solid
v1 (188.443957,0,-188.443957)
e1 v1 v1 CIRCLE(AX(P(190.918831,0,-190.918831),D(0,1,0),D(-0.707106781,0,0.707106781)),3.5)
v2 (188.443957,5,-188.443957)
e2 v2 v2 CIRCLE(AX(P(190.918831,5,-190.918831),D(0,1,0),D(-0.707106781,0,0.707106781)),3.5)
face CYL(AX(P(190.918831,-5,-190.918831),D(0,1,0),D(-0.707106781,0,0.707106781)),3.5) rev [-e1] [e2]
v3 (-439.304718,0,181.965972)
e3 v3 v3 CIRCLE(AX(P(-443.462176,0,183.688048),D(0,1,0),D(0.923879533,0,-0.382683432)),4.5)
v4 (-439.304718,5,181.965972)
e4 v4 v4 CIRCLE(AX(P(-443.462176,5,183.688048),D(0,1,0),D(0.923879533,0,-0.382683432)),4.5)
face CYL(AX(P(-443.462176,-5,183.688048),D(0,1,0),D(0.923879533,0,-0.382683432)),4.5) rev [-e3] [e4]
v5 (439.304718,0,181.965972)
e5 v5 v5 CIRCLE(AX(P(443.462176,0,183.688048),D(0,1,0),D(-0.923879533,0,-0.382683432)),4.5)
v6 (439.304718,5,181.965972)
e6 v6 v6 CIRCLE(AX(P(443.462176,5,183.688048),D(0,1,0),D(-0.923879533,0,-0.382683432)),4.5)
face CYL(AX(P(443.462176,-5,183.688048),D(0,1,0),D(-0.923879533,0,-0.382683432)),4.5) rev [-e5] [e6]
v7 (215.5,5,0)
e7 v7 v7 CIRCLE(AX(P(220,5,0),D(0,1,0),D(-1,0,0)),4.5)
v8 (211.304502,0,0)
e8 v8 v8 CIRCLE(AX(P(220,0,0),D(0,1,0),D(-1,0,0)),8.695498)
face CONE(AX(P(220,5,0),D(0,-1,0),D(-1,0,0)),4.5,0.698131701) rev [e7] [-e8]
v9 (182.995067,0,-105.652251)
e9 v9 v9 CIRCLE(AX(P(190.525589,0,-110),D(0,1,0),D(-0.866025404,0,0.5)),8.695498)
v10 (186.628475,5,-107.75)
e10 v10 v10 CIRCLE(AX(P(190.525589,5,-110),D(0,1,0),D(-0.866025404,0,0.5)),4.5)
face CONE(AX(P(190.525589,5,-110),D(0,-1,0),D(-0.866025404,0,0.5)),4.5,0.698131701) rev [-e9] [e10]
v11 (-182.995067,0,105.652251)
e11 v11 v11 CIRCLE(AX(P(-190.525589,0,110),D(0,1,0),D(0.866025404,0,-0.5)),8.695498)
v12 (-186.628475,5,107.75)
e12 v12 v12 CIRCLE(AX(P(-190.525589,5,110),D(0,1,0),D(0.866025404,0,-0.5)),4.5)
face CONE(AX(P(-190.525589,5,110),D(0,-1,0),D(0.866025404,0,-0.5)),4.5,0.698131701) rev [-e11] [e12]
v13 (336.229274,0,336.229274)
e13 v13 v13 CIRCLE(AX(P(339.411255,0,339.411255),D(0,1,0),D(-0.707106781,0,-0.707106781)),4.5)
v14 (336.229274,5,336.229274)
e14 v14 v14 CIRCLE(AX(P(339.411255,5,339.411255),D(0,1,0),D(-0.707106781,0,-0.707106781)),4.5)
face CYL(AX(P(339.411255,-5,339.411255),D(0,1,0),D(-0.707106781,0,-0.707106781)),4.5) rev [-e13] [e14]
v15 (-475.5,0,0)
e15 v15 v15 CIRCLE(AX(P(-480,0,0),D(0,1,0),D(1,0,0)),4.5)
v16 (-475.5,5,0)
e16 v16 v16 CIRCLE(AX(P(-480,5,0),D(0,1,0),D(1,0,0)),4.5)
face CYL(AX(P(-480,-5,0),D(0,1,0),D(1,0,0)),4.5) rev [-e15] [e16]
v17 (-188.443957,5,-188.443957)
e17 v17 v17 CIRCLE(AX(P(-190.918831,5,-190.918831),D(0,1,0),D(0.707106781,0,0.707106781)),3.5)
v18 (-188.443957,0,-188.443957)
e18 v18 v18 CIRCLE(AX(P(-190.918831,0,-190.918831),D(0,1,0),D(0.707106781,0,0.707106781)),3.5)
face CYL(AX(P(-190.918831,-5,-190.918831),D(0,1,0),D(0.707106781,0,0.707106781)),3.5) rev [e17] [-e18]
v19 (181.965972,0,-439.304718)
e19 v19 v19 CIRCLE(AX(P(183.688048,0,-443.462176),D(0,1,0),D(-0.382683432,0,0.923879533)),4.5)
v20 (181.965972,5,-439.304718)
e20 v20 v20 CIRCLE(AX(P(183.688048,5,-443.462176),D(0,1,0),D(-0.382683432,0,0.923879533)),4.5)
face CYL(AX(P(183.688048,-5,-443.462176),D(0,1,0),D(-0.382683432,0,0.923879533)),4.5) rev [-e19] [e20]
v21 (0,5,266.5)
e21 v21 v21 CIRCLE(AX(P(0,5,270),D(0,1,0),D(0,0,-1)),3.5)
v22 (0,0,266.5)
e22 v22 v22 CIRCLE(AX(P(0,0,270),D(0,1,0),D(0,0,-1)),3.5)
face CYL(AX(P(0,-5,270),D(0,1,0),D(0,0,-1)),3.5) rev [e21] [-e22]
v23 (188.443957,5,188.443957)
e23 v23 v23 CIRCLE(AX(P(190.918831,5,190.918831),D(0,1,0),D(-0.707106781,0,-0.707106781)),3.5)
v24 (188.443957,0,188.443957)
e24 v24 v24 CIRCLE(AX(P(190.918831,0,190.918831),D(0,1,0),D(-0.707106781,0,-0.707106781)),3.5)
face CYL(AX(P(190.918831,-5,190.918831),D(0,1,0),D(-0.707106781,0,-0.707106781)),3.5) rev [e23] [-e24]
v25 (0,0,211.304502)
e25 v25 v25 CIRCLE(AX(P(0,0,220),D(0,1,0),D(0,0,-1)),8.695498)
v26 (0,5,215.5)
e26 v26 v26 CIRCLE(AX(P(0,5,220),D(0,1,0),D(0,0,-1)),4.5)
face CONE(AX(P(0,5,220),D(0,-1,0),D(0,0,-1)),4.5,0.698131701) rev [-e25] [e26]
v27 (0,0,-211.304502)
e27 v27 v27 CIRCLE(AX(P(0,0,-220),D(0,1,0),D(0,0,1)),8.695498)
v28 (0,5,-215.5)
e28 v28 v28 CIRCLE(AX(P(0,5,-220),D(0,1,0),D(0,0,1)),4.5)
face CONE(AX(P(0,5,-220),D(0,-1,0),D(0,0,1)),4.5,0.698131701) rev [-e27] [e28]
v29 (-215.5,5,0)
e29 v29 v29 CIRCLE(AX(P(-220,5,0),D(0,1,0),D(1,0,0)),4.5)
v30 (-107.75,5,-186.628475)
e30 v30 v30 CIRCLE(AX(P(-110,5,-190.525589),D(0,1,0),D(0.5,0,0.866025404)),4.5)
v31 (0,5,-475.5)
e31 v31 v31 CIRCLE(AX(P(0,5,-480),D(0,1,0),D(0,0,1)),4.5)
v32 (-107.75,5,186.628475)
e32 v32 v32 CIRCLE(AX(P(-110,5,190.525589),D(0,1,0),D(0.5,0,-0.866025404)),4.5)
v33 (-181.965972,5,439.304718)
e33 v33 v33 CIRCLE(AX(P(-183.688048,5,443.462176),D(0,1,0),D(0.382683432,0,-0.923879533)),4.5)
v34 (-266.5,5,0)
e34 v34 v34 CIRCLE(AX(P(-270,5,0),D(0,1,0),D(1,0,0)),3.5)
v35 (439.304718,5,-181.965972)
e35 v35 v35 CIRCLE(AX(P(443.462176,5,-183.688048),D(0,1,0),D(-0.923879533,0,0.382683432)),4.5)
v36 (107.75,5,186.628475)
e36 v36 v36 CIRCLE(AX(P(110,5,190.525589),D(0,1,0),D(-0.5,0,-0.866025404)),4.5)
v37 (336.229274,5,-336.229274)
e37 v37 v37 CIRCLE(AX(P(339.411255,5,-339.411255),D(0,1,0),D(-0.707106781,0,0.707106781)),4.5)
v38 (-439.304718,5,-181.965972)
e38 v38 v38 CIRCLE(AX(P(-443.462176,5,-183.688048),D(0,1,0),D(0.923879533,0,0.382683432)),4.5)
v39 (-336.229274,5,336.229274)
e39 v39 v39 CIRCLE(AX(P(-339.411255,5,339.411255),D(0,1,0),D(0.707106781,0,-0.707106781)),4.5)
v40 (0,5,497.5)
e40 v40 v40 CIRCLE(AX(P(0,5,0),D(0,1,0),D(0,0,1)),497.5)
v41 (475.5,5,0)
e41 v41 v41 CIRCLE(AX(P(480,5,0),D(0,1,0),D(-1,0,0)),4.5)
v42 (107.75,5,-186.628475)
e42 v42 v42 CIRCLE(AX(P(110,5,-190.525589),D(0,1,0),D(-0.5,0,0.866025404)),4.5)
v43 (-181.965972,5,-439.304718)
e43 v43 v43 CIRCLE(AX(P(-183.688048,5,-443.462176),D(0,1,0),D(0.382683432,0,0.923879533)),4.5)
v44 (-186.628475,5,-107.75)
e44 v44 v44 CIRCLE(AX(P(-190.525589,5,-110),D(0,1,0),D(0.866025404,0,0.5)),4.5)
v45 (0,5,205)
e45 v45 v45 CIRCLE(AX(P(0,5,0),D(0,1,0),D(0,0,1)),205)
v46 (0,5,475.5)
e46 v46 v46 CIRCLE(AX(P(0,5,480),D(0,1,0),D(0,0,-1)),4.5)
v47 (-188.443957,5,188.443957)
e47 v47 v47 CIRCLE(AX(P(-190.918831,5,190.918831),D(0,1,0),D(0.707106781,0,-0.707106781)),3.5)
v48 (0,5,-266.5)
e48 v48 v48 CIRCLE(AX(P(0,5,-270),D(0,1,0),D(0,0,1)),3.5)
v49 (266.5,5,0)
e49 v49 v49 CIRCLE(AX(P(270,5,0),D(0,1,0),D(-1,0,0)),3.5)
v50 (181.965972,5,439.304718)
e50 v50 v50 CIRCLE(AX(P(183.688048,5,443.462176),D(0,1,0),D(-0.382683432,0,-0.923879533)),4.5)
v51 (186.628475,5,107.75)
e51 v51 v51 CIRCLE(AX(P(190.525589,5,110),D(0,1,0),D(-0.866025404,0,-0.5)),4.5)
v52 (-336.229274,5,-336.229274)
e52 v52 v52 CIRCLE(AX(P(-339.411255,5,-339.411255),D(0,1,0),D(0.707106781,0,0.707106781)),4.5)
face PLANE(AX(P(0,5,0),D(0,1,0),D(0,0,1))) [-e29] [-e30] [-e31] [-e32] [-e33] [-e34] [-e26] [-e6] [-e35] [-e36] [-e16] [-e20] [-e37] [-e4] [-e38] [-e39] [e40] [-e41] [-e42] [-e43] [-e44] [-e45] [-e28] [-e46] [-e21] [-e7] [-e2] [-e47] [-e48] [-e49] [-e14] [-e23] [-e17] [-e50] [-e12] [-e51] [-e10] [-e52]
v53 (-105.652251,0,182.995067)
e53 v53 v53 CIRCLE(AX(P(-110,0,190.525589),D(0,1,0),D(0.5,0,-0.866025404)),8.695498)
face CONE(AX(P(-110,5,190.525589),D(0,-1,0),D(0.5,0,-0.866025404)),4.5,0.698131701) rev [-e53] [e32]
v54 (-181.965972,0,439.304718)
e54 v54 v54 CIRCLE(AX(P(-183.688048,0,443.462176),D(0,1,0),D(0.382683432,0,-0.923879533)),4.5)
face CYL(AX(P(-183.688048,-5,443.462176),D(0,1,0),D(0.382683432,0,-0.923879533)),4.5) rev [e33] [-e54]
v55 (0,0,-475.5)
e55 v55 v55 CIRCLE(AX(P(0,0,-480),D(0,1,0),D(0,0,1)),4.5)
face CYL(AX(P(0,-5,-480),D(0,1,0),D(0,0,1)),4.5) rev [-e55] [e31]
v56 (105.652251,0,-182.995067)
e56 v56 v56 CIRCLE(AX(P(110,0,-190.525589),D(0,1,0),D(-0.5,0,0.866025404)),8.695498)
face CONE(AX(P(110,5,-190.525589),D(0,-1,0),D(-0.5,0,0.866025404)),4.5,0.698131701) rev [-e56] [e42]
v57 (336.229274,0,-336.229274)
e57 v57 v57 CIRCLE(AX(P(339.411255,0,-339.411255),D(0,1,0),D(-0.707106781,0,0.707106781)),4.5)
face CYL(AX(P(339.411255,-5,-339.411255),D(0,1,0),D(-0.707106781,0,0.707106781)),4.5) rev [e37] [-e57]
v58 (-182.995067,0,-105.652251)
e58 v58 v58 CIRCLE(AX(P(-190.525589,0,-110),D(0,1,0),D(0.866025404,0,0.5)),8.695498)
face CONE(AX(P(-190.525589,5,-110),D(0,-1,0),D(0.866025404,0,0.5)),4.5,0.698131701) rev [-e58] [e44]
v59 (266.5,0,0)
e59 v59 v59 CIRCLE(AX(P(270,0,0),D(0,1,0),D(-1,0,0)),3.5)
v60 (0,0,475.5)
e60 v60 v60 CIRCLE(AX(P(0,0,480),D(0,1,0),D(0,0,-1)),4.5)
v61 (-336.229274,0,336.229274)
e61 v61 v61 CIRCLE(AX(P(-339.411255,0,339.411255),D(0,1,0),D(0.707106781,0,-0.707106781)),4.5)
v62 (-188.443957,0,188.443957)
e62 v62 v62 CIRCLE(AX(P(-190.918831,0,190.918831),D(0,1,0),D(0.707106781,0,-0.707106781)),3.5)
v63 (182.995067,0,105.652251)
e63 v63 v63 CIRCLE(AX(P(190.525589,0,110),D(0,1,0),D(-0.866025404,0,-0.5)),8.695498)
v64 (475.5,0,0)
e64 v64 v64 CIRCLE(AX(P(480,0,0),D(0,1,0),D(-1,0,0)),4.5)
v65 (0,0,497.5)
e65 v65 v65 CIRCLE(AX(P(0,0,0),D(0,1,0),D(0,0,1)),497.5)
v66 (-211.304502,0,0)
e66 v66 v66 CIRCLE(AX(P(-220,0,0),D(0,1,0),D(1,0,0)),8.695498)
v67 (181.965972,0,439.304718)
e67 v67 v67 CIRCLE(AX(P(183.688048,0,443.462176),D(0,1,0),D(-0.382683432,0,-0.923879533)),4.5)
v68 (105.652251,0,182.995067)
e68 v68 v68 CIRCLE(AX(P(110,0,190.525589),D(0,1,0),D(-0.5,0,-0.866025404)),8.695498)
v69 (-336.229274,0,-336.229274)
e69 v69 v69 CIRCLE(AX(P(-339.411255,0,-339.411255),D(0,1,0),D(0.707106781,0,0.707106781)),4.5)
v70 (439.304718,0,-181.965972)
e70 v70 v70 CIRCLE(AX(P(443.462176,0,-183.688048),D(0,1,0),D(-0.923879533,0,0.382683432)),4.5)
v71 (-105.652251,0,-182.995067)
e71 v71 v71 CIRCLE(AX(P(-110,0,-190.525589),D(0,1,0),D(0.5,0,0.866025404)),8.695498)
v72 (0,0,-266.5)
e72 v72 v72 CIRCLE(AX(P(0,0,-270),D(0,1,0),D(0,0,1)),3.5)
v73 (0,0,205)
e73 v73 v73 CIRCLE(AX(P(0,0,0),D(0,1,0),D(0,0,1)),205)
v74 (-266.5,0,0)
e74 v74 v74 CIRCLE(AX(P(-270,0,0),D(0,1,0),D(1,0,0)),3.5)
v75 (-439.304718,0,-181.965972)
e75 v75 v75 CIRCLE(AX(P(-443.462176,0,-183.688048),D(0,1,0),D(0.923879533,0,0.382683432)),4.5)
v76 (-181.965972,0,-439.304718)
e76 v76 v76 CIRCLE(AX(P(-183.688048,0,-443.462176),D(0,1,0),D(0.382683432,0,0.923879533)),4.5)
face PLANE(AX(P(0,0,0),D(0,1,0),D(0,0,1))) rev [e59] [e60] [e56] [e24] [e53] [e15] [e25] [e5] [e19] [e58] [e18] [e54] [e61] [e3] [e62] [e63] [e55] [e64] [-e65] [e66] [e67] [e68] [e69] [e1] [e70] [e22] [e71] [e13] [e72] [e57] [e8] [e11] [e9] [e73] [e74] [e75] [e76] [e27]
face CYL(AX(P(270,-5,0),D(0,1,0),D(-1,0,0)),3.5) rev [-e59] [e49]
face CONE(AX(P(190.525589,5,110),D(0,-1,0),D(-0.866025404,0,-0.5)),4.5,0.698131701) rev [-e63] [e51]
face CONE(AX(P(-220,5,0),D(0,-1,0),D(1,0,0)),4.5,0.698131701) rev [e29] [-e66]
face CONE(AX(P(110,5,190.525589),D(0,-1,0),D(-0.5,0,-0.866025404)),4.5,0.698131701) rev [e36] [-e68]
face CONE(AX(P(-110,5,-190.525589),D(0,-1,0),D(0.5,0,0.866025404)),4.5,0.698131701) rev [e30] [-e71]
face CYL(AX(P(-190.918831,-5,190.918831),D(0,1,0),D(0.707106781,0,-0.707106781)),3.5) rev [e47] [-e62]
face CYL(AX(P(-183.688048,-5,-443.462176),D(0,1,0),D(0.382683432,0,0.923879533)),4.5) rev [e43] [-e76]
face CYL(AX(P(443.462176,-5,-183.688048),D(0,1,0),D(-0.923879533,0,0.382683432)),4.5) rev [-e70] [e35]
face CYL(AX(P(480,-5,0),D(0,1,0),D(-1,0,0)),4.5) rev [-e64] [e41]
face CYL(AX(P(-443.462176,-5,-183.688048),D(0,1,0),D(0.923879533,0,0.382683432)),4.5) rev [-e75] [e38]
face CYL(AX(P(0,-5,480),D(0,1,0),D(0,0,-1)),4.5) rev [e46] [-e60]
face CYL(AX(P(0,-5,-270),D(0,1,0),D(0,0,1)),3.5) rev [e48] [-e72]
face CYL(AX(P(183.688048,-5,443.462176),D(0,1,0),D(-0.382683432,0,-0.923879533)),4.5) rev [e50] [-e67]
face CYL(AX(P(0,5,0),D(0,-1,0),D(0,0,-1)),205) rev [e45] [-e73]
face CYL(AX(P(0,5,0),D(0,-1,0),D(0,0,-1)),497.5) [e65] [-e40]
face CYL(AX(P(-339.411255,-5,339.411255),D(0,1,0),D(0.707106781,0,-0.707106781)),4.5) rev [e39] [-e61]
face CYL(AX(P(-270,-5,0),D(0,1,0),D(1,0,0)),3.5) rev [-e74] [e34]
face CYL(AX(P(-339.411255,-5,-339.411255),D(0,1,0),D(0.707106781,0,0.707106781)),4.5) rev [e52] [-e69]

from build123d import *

# Parameters (mm, degrees)
SKETCH1_R                    = 497.5
SKETCH1_R_2                  = 205
BOSS_EXTRUDE1_DEPTH          = 5
SKETCH2_R                    = 4.5
SKETCH2_R_2                  = 3.5
CUT_EXTRUDE1_DEPTH           = 10
CIRPATTERN1_OUTLINE_R        = 4.5
CIRPATTERN1_DEPTH            = 5
CIRPATTERN2_COUNT            = 8
SKETCH3_R                    = 4.5
CUT_EXTRUDE3_DEPTH           = 10
CUT_EXTRUDE3_DRAFT           = 40
CIRPATTERN3_COPY_1_SKETCH_R  = 4.5
CIRPATTERN3_COPY_1_DEPTH     = 10
CIRPATTERN3_COPY_1_DRAFT     = 40
CIRPATTERN3_COPY_2_SKETCH_R  = 4.5
CIRPATTERN3_COPY_2_DEPTH     = 10
CIRPATTERN3_COPY_2_DRAFT     = 40
CIRPATTERN3_COPY_3_SKETCH_R  = 4.5
CIRPATTERN3_COPY_3_DEPTH     = 10
CIRPATTERN3_COPY_3_DRAFT     = 40
CIRPATTERN3_COPY_4_SKETCH_R  = 4.5
CIRPATTERN3_COPY_4_DEPTH     = 10
CIRPATTERN3_COPY_4_DRAFT     = 40
CIRPATTERN3_COPY_5_SKETCH_R  = 4.5
CIRPATTERN3_COPY_5_DEPTH     = 10
CIRPATTERN3_COPY_5_DRAFT     = 40
CIRPATTERN3_COPY_6_SKETCH_R  = 4.5
CIRPATTERN3_COPY_6_DEPTH     = 10
CIRPATTERN3_COPY_6_DRAFT     = 40
CIRPATTERN3_COPY_7_SKETCH_R  = 4.5
CIRPATTERN3_COPY_7_DEPTH     = 10
CIRPATTERN3_COPY_7_DRAFT     = 40
CIRPATTERN3_COPY_8_SKETCH_R  = 4.5
CIRPATTERN3_COPY_8_DEPTH     = 10
CIRPATTERN3_COPY_8_DRAFT     = 40
CIRPATTERN3_COPY_9_SKETCH_R  = 4.5
CIRPATTERN3_COPY_9_DEPTH     = 10
CIRPATTERN3_COPY_9_DRAFT     = 40
CIRPATTERN3_COPY_10_SKETCH_R = 4.5
CIRPATTERN3_COPY_10_DEPTH    = 10
CIRPATTERN3_COPY_10_DRAFT    = 40
CIRPATTERN3_COPY_11_SKETCH_R = 4.5
CIRPATTERN3_COPY_11_DEPTH    = 10
CIRPATTERN3_COPY_11_DRAFT    = 40


# Read off the part's stored shape, not the designer's step: CirPattern1
with BuildPart() as part:
    # Sketch1 → Boss-Extrude1 (new body)
    with BuildSketch(Plane(origin=(0, 0, 0), x_dir=(1, 0, 0), z_dir=(0, 1, 0))):
        with Locations(Location((0, 0, 0), (0, 0, 270))):
            Circle(SKETCH1_R)
        with Locations(Location((0, 0, 0), (0, 0, 270))):
            Circle(SKETCH1_R_2, mode=Mode.SUBTRACT)
    extrude(amount=BOSS_EXTRUDE1_DEPTH)

    # Sketch2 → Cut-Extrude1 (cut)
    with BuildSketch(Plane(origin=(0, 5, 0), x_dir=(1, 0, 0), z_dir=(0, 1, 0))):
        with Locations(Location((0, 480, 0), (0, 0, 270))):
            Circle(SKETCH2_R)
        with Locations(Location((0, 270, 0), (0, 0, 270))):
            Circle(SKETCH2_R_2)
    cut_extrude1 = extrude(amount=-CUT_EXTRUDE1_DEPTH, mode=Mode.SUBTRACT)

    # CirPattern1 outline → CirPattern1 (cut)
    with BuildSketch(Plane(origin=(0, 0, 0), x_dir=(1, 0, 0), z_dir=(0, 1, 0))):
        with Locations((183.688047535, 443.462175605)):
            Circle(CIRPATTERN1_OUTLINE_R)
        with Locations((339.41125497, 339.41125497)):
            Circle(CIRPATTERN1_OUTLINE_R)
        with Locations((443.462175605, 183.688047535)):
            Circle(CIRPATTERN1_OUTLINE_R)
        with Locations((480, 0)):
            Circle(CIRPATTERN1_OUTLINE_R)
        with Locations((443.462175605, -183.688047535)):
            Circle(CIRPATTERN1_OUTLINE_R)
        with Locations((339.41125497, -339.41125497)):
            Circle(CIRPATTERN1_OUTLINE_R)
        with Locations((183.688047535, -443.462175605)):
            Circle(CIRPATTERN1_OUTLINE_R)
        with Locations((0, -480)):
            Circle(CIRPATTERN1_OUTLINE_R)
        with Locations((-183.688047535, -443.462175605)):
            Circle(CIRPATTERN1_OUTLINE_R)
        with Locations((-339.41125497, -339.41125497)):
            Circle(CIRPATTERN1_OUTLINE_R)
        with Locations((-443.462175605, -183.688047535)):
            Circle(CIRPATTERN1_OUTLINE_R)
        with Locations((-480, 0)):
            Circle(CIRPATTERN1_OUTLINE_R)
        with Locations((-443.462175605, 183.688047535)):
            Circle(CIRPATTERN1_OUTLINE_R)
        with Locations((-339.41125497, 339.41125497)):
            Circle(CIRPATTERN1_OUTLINE_R)
        with Locations((-183.688047535, 443.462175605)):
            Circle(CIRPATTERN1_OUTLINE_R)
    extrude(amount=CIRPATTERN1_DEPTH, mode=Mode.SUBTRACT)

    # CirPattern2: Cut-Extrude1 ×8 about axis
    cirpattern2_axis = Axis((0, 0, 0), (0, 1, 0))
    for i in range(1, CIRPATTERN2_COUNT):
        add(cut_extrude1.rotate(cirpattern2_axis, i * 360 / CIRPATTERN2_COUNT), mode=Mode.SUBTRACT)


with BuildPart() as cut_extrude3_tool:
    # Sketch3 → Cut-Extrude3 (with draft: the straight prism first)
    with BuildSketch(Plane(origin=(0, 5, 0), x_dir=(1, 0, 0), z_dir=(0, 1, 0))):
        with Locations((0, 220)):
            Circle(SKETCH3_R)
    extrude(amount=-CUT_EXTRUDE3_DEPTH)
    # Cut-Extrude3: the draft: its side faces are tilted about the plane it starts from
    cut_extrude3_sides = [cut_extrude3_tool.faces().sort_by_distance(p)[0] for p in [
        (-4.5, 0, -220),
    ]]
    draft(cut_extrude3_sides, Plane(origin=(0, 5, 0), x_dir=(1, 0, 0), z_dir=(0, 1, 0)), CUT_EXTRUDE3_DRAFT)


with BuildPart() as part_1:
    add(part.part)

    # Cut-Extrude3: cut by cut_extrude3_tool
    add(cut_extrude3_tool.part, mode=Mode.SUBTRACT)


with BuildPart() as cirpattern3_copy_1_tool:
    # CirPattern3 copy 1 sketch → CirPattern3 copy 1 (with draft: the straight prism first)
    with BuildSketch(Plane(origin=(0, 5, 0), x_dir=(0.8660254037844387, 0, -0.49999999999999994), z_dir=(0, 1, 0))):
        with Locations((0, 220)):
            Circle(CIRPATTERN3_COPY_1_SKETCH_R)
    extrude(amount=-CIRPATTERN3_COPY_1_DEPTH)
    # CirPattern3 copy 1: the draft: its side faces are tilted about the plane it starts from
    cirpattern3_copy_1_sides = [cirpattern3_copy_1_tool.faces().sort_by_distance(p)[0] for p in [
        (-113.897114317, 0, -188.275588833),
    ]]
    draft(cirpattern3_copy_1_sides, Plane(origin=(0, 5, 0), x_dir=(0.8660254037844387, 0, -0.49999999999999994), z_dir=(0, 1, 0)), CIRPATTERN3_COPY_1_DRAFT)


with BuildPart() as part_2:
    add(part_1.part)

    # CirPattern3 copy 1: cut by cirpattern3_copy_1_tool
    add(cirpattern3_copy_1_tool.part, mode=Mode.SUBTRACT)


with BuildPart() as cirpattern3_copy_2_tool:
    # CirPattern3 copy 2 sketch → CirPattern3 copy 2 (with draft: the straight prism first)
    with BuildSketch(Plane(origin=(0, 5, 0), x_dir=(0.5000000000000001, 0, -0.8660254037844386), z_dir=(0, 1, 0))):
        with Locations((0, 220)):
            Circle(CIRPATTERN3_COPY_2_SKETCH_R)
    extrude(amount=-CIRPATTERN3_COPY_2_DEPTH)
    # CirPattern3 copy 2: the draft: its side faces are tilted about the plane it starts from
    cirpattern3_copy_2_sides = [cirpattern3_copy_2_tool.faces().sort_by_distance(p)[0] for p in [
        (-192.775588833, 0, -106.102885683),
    ]]
    draft(cirpattern3_copy_2_sides, Plane(origin=(0, 5, 0), x_dir=(0.5000000000000001, 0, -0.8660254037844386), z_dir=(0, 1, 0)), CIRPATTERN3_COPY_2_DRAFT)


with BuildPart() as part_3:
    add(part_2.part)

    # CirPattern3 copy 2: cut by cirpattern3_copy_2_tool
    add(cirpattern3_copy_2_tool.part, mode=Mode.SUBTRACT)


with BuildPart() as cirpattern3_copy_3_tool:
    # CirPattern3 copy 3 sketch → CirPattern3 copy 3 (with draft: the straight prism first)
    with BuildSketch(Plane(origin=(0, 5, 0), x_dir=(0, 0, -1), z_dir=(0, 1, 0))):
        with Locations((0, 220)):
            Circle(CIRPATTERN3_COPY_3_SKETCH_R)
    extrude(amount=-CIRPATTERN3_COPY_3_DEPTH)
    # CirPattern3 copy 3: the draft: its side faces are tilted about the plane it starts from
    cirpattern3_copy_3_sides = [cirpattern3_copy_3_tool.faces().sort_by_distance(p)[0] for p in [
        (-220, 0, 4.5),
    ]]
    draft(cirpattern3_copy_3_sides, Plane(origin=(0, 5, 0), x_dir=(0, 0, -1), z_dir=(0, 1, 0)), CIRPATTERN3_COPY_3_DRAFT)


with BuildPart() as part_4:
    add(part_3.part)

    # CirPattern3 copy 3: cut by cirpattern3_copy_3_tool
    add(cirpattern3_copy_3_tool.part, mode=Mode.SUBTRACT)


with BuildPart() as cirpattern3_copy_4_tool:
    # CirPattern3 copy 4 sketch → CirPattern3 copy 4 (with draft: the straight prism first)
    with BuildSketch(Plane(origin=(0, 5, 0), x_dir=(-0.4999999999999998, 0, -0.8660254037844387), z_dir=(0, 1, 0))):
        with Locations((0, 220)):
            Circle(CIRPATTERN3_COPY_4_SKETCH_R)
    extrude(amount=-CIRPATTERN3_COPY_4_DEPTH)
    # CirPattern3 copy 4: the draft: its side faces are tilted about the plane it starts from
    cirpattern3_copy_4_sides = [cirpattern3_copy_4_tool.faces().sort_by_distance(p)[0] for p in [
        (-188.275588833, 0, 113.897114317),
    ]]
    draft(cirpattern3_copy_4_sides, Plane(origin=(0, 5, 0), x_dir=(-0.4999999999999998, 0, -0.8660254037844387), z_dir=(0, 1, 0)), CIRPATTERN3_COPY_4_DRAFT)


with BuildPart() as part_5:
    add(part_4.part)

    # CirPattern3 copy 4: cut by cirpattern3_copy_4_tool
    add(cirpattern3_copy_4_tool.part, mode=Mode.SUBTRACT)


with BuildPart() as cirpattern3_copy_5_tool:
    # CirPattern3 copy 5 sketch → CirPattern3 copy 5 (with draft: the straight prism first)
    with BuildSketch(Plane(origin=(0, 5, 0), x_dir=(-0.8660254037844387, 0, -0.49999999999999994), z_dir=(0, 1, 0))):
        with Locations((0, 220)):
            Circle(CIRPATTERN3_COPY_5_SKETCH_R)
    extrude(amount=-CIRPATTERN3_COPY_5_DEPTH)
    # CirPattern3 copy 5: the draft: its side faces are tilted about the plane it starts from
    cirpattern3_copy_5_sides = [cirpattern3_copy_5_tool.faces().sort_by_distance(p)[0] for p in [
        (-106.102885683, 0, 192.775588833),
    ]]
    draft(cirpattern3_copy_5_sides, Plane(origin=(0, 5, 0), x_dir=(-0.8660254037844387, 0, -0.49999999999999994), z_dir=(0, 1, 0)), CIRPATTERN3_COPY_5_DRAFT)


with BuildPart() as part_6:
    add(part_5.part)

    # CirPattern3 copy 5: cut by cirpattern3_copy_5_tool
    add(cirpattern3_copy_5_tool.part, mode=Mode.SUBTRACT)


with BuildPart() as cirpattern3_copy_6_tool:
    # CirPattern3 copy 6 sketch → CirPattern3 copy 6 (with draft: the straight prism first)
    with BuildSketch(Plane(origin=(0, 5, 0), x_dir=(-1, 0, 0), z_dir=(0, 1, 0))):
        with Locations((0, 220)):
            Circle(CIRPATTERN3_COPY_6_SKETCH_R)
    extrude(amount=-CIRPATTERN3_COPY_6_DEPTH)
    # CirPattern3 copy 6: the draft: its side faces are tilted about the plane it starts from
    cirpattern3_copy_6_sides = [cirpattern3_copy_6_tool.faces().sort_by_distance(p)[0] for p in [
        (4.5, 0, 220),
    ]]
    draft(cirpattern3_copy_6_sides, Plane(origin=(0, 5, 0), x_dir=(-1, 0, 0), z_dir=(0, 1, 0)), CIRPATTERN3_COPY_6_DRAFT)


with BuildPart() as part_7:
    add(part_6.part)

    # CirPattern3 copy 6: cut by cirpattern3_copy_6_tool
    add(cirpattern3_copy_6_tool.part, mode=Mode.SUBTRACT)


with BuildPart() as cirpattern3_copy_7_tool:
    # CirPattern3 copy 7 sketch → CirPattern3 copy 7 (with draft: the straight prism first)
    with BuildSketch(Plane(origin=(0, 5, 0), x_dir=(-0.8660254037844386, 0, 0.5000000000000001), z_dir=(0, 1, 0))):
        with Locations((0, 220)):
            Circle(CIRPATTERN3_COPY_7_SKETCH_R)
    extrude(amount=-CIRPATTERN3_COPY_7_DEPTH)
    # CirPattern3 copy 7: the draft: its side faces are tilted about the plane it starts from
    cirpattern3_copy_7_sides = [cirpattern3_copy_7_tool.faces().sort_by_distance(p)[0] for p in [
        (113.897114317, 0, 188.275588833),
    ]]
    draft(cirpattern3_copy_7_sides, Plane(origin=(0, 5, 0), x_dir=(-0.8660254037844386, 0, 0.5000000000000001), z_dir=(0, 1, 0)), CIRPATTERN3_COPY_7_DRAFT)


with BuildPart() as part_8:
    add(part_7.part)

    # CirPattern3 copy 7: cut by cirpattern3_copy_7_tool
    add(cirpattern3_copy_7_tool.part, mode=Mode.SUBTRACT)


with BuildPart() as cirpattern3_copy_8_tool:
    # CirPattern3 copy 8 sketch → CirPattern3 copy 8 (with draft: the straight prism first)
    with BuildSketch(Plane(origin=(0, 5, 0), x_dir=(-0.5000000000000004, 0, 0.8660254037844384), z_dir=(0, 1, 0))):
        with Locations((0, 220)):
            Circle(CIRPATTERN3_COPY_8_SKETCH_R)
    extrude(amount=-CIRPATTERN3_COPY_8_DEPTH)
    # CirPattern3 copy 8: the draft: its side faces are tilted about the plane it starts from
    cirpattern3_copy_8_sides = [cirpattern3_copy_8_tool.faces().sort_by_distance(p)[0] for p in [
        (192.775588833, 0, 106.102885683),
    ]]
    draft(cirpattern3_copy_8_sides, Plane(origin=(0, 5, 0), x_dir=(-0.5000000000000004, 0, 0.8660254037844384), z_dir=(0, 1, 0)), CIRPATTERN3_COPY_8_DRAFT)


with BuildPart() as part_9:
    add(part_8.part)

    # CirPattern3 copy 8: cut by cirpattern3_copy_8_tool
    add(cirpattern3_copy_8_tool.part, mode=Mode.SUBTRACT)


with BuildPart() as cirpattern3_copy_9_tool:
    # CirPattern3 copy 9 sketch → CirPattern3 copy 9 (with draft: the straight prism first)
    with BuildSketch(Plane.ZX.offset(5)):
        with Locations((0, 220)):
            Circle(CIRPATTERN3_COPY_9_SKETCH_R)
    extrude(amount=-CIRPATTERN3_COPY_9_DEPTH)
    # CirPattern3 copy 9: the draft: its side faces are tilted about the plane it starts from
    cirpattern3_copy_9_sides = [cirpattern3_copy_9_tool.faces().sort_by_distance(p)[0] for p in [
        (220, 0, -4.5),
    ]]
    draft(cirpattern3_copy_9_sides, Plane.ZX.offset(5), CIRPATTERN3_COPY_9_DRAFT)


with BuildPart() as part_10:
    add(part_9.part)

    # CirPattern3 copy 9: cut by cirpattern3_copy_9_tool
    add(cirpattern3_copy_9_tool.part, mode=Mode.SUBTRACT)


with BuildPart() as cirpattern3_copy_10_tool:
    # CirPattern3 copy 10 sketch → CirPattern3 copy 10 (with draft: the straight prism first)
    with BuildSketch(Plane(origin=(0, 5, 0), x_dir=(0.5000000000000001, 0, 0.8660254037844386), z_dir=(0, 1, 0))):
        with Locations((0, 220)):
            Circle(CIRPATTERN3_COPY_10_SKETCH_R)
    extrude(amount=-CIRPATTERN3_COPY_10_DEPTH)
    # CirPattern3 copy 10: the draft: its side faces are tilted about the plane it starts from
    cirpattern3_copy_10_sides = [cirpattern3_copy_10_tool.faces().sort_by_distance(p)[0] for p in [
        (188.275588833, 0, -113.897114317),
    ]]
    draft(cirpattern3_copy_10_sides, Plane(origin=(0, 5, 0), x_dir=(0.5000000000000001, 0, 0.8660254037844386), z_dir=(0, 1, 0)), CIRPATTERN3_COPY_10_DRAFT)


with BuildPart() as part_11:
    add(part_10.part)

    # CirPattern3 copy 10: cut by cirpattern3_copy_10_tool
    add(cirpattern3_copy_10_tool.part, mode=Mode.SUBTRACT)


with BuildPart() as cirpattern3_copy_11_tool:
    # CirPattern3 copy 11 sketch → CirPattern3 copy 11 (with draft: the straight prism first)
    with BuildSketch(Plane(origin=(0, 5, 0), x_dir=(0.8660254037844384, 0, 0.5000000000000004), z_dir=(0, 1, 0))):
        with Locations((0, 220)):
            Circle(CIRPATTERN3_COPY_11_SKETCH_R)
    extrude(amount=-CIRPATTERN3_COPY_11_DEPTH)
    # CirPattern3 copy 11: the draft: its side faces are tilted about the plane it starts from
    cirpattern3_copy_11_sides = [cirpattern3_copy_11_tool.faces().sort_by_distance(p)[0] for p in [
        (106.102885683, 0, -192.775588833),
    ]]
    draft(cirpattern3_copy_11_sides, Plane(origin=(0, 5, 0), x_dir=(0.8660254037844384, 0, 0.5000000000000004), z_dir=(0, 1, 0)), CIRPATTERN3_COPY_11_DRAFT)


with BuildPart() as part_12:
    add(part_11.part)

    # CirPattern3 copy 11: cut by cirpattern3_copy_11_tool
    add(cirpattern3_copy_11_tool.part, mode=Mode.SUBTRACT)


solid = part_12.part
